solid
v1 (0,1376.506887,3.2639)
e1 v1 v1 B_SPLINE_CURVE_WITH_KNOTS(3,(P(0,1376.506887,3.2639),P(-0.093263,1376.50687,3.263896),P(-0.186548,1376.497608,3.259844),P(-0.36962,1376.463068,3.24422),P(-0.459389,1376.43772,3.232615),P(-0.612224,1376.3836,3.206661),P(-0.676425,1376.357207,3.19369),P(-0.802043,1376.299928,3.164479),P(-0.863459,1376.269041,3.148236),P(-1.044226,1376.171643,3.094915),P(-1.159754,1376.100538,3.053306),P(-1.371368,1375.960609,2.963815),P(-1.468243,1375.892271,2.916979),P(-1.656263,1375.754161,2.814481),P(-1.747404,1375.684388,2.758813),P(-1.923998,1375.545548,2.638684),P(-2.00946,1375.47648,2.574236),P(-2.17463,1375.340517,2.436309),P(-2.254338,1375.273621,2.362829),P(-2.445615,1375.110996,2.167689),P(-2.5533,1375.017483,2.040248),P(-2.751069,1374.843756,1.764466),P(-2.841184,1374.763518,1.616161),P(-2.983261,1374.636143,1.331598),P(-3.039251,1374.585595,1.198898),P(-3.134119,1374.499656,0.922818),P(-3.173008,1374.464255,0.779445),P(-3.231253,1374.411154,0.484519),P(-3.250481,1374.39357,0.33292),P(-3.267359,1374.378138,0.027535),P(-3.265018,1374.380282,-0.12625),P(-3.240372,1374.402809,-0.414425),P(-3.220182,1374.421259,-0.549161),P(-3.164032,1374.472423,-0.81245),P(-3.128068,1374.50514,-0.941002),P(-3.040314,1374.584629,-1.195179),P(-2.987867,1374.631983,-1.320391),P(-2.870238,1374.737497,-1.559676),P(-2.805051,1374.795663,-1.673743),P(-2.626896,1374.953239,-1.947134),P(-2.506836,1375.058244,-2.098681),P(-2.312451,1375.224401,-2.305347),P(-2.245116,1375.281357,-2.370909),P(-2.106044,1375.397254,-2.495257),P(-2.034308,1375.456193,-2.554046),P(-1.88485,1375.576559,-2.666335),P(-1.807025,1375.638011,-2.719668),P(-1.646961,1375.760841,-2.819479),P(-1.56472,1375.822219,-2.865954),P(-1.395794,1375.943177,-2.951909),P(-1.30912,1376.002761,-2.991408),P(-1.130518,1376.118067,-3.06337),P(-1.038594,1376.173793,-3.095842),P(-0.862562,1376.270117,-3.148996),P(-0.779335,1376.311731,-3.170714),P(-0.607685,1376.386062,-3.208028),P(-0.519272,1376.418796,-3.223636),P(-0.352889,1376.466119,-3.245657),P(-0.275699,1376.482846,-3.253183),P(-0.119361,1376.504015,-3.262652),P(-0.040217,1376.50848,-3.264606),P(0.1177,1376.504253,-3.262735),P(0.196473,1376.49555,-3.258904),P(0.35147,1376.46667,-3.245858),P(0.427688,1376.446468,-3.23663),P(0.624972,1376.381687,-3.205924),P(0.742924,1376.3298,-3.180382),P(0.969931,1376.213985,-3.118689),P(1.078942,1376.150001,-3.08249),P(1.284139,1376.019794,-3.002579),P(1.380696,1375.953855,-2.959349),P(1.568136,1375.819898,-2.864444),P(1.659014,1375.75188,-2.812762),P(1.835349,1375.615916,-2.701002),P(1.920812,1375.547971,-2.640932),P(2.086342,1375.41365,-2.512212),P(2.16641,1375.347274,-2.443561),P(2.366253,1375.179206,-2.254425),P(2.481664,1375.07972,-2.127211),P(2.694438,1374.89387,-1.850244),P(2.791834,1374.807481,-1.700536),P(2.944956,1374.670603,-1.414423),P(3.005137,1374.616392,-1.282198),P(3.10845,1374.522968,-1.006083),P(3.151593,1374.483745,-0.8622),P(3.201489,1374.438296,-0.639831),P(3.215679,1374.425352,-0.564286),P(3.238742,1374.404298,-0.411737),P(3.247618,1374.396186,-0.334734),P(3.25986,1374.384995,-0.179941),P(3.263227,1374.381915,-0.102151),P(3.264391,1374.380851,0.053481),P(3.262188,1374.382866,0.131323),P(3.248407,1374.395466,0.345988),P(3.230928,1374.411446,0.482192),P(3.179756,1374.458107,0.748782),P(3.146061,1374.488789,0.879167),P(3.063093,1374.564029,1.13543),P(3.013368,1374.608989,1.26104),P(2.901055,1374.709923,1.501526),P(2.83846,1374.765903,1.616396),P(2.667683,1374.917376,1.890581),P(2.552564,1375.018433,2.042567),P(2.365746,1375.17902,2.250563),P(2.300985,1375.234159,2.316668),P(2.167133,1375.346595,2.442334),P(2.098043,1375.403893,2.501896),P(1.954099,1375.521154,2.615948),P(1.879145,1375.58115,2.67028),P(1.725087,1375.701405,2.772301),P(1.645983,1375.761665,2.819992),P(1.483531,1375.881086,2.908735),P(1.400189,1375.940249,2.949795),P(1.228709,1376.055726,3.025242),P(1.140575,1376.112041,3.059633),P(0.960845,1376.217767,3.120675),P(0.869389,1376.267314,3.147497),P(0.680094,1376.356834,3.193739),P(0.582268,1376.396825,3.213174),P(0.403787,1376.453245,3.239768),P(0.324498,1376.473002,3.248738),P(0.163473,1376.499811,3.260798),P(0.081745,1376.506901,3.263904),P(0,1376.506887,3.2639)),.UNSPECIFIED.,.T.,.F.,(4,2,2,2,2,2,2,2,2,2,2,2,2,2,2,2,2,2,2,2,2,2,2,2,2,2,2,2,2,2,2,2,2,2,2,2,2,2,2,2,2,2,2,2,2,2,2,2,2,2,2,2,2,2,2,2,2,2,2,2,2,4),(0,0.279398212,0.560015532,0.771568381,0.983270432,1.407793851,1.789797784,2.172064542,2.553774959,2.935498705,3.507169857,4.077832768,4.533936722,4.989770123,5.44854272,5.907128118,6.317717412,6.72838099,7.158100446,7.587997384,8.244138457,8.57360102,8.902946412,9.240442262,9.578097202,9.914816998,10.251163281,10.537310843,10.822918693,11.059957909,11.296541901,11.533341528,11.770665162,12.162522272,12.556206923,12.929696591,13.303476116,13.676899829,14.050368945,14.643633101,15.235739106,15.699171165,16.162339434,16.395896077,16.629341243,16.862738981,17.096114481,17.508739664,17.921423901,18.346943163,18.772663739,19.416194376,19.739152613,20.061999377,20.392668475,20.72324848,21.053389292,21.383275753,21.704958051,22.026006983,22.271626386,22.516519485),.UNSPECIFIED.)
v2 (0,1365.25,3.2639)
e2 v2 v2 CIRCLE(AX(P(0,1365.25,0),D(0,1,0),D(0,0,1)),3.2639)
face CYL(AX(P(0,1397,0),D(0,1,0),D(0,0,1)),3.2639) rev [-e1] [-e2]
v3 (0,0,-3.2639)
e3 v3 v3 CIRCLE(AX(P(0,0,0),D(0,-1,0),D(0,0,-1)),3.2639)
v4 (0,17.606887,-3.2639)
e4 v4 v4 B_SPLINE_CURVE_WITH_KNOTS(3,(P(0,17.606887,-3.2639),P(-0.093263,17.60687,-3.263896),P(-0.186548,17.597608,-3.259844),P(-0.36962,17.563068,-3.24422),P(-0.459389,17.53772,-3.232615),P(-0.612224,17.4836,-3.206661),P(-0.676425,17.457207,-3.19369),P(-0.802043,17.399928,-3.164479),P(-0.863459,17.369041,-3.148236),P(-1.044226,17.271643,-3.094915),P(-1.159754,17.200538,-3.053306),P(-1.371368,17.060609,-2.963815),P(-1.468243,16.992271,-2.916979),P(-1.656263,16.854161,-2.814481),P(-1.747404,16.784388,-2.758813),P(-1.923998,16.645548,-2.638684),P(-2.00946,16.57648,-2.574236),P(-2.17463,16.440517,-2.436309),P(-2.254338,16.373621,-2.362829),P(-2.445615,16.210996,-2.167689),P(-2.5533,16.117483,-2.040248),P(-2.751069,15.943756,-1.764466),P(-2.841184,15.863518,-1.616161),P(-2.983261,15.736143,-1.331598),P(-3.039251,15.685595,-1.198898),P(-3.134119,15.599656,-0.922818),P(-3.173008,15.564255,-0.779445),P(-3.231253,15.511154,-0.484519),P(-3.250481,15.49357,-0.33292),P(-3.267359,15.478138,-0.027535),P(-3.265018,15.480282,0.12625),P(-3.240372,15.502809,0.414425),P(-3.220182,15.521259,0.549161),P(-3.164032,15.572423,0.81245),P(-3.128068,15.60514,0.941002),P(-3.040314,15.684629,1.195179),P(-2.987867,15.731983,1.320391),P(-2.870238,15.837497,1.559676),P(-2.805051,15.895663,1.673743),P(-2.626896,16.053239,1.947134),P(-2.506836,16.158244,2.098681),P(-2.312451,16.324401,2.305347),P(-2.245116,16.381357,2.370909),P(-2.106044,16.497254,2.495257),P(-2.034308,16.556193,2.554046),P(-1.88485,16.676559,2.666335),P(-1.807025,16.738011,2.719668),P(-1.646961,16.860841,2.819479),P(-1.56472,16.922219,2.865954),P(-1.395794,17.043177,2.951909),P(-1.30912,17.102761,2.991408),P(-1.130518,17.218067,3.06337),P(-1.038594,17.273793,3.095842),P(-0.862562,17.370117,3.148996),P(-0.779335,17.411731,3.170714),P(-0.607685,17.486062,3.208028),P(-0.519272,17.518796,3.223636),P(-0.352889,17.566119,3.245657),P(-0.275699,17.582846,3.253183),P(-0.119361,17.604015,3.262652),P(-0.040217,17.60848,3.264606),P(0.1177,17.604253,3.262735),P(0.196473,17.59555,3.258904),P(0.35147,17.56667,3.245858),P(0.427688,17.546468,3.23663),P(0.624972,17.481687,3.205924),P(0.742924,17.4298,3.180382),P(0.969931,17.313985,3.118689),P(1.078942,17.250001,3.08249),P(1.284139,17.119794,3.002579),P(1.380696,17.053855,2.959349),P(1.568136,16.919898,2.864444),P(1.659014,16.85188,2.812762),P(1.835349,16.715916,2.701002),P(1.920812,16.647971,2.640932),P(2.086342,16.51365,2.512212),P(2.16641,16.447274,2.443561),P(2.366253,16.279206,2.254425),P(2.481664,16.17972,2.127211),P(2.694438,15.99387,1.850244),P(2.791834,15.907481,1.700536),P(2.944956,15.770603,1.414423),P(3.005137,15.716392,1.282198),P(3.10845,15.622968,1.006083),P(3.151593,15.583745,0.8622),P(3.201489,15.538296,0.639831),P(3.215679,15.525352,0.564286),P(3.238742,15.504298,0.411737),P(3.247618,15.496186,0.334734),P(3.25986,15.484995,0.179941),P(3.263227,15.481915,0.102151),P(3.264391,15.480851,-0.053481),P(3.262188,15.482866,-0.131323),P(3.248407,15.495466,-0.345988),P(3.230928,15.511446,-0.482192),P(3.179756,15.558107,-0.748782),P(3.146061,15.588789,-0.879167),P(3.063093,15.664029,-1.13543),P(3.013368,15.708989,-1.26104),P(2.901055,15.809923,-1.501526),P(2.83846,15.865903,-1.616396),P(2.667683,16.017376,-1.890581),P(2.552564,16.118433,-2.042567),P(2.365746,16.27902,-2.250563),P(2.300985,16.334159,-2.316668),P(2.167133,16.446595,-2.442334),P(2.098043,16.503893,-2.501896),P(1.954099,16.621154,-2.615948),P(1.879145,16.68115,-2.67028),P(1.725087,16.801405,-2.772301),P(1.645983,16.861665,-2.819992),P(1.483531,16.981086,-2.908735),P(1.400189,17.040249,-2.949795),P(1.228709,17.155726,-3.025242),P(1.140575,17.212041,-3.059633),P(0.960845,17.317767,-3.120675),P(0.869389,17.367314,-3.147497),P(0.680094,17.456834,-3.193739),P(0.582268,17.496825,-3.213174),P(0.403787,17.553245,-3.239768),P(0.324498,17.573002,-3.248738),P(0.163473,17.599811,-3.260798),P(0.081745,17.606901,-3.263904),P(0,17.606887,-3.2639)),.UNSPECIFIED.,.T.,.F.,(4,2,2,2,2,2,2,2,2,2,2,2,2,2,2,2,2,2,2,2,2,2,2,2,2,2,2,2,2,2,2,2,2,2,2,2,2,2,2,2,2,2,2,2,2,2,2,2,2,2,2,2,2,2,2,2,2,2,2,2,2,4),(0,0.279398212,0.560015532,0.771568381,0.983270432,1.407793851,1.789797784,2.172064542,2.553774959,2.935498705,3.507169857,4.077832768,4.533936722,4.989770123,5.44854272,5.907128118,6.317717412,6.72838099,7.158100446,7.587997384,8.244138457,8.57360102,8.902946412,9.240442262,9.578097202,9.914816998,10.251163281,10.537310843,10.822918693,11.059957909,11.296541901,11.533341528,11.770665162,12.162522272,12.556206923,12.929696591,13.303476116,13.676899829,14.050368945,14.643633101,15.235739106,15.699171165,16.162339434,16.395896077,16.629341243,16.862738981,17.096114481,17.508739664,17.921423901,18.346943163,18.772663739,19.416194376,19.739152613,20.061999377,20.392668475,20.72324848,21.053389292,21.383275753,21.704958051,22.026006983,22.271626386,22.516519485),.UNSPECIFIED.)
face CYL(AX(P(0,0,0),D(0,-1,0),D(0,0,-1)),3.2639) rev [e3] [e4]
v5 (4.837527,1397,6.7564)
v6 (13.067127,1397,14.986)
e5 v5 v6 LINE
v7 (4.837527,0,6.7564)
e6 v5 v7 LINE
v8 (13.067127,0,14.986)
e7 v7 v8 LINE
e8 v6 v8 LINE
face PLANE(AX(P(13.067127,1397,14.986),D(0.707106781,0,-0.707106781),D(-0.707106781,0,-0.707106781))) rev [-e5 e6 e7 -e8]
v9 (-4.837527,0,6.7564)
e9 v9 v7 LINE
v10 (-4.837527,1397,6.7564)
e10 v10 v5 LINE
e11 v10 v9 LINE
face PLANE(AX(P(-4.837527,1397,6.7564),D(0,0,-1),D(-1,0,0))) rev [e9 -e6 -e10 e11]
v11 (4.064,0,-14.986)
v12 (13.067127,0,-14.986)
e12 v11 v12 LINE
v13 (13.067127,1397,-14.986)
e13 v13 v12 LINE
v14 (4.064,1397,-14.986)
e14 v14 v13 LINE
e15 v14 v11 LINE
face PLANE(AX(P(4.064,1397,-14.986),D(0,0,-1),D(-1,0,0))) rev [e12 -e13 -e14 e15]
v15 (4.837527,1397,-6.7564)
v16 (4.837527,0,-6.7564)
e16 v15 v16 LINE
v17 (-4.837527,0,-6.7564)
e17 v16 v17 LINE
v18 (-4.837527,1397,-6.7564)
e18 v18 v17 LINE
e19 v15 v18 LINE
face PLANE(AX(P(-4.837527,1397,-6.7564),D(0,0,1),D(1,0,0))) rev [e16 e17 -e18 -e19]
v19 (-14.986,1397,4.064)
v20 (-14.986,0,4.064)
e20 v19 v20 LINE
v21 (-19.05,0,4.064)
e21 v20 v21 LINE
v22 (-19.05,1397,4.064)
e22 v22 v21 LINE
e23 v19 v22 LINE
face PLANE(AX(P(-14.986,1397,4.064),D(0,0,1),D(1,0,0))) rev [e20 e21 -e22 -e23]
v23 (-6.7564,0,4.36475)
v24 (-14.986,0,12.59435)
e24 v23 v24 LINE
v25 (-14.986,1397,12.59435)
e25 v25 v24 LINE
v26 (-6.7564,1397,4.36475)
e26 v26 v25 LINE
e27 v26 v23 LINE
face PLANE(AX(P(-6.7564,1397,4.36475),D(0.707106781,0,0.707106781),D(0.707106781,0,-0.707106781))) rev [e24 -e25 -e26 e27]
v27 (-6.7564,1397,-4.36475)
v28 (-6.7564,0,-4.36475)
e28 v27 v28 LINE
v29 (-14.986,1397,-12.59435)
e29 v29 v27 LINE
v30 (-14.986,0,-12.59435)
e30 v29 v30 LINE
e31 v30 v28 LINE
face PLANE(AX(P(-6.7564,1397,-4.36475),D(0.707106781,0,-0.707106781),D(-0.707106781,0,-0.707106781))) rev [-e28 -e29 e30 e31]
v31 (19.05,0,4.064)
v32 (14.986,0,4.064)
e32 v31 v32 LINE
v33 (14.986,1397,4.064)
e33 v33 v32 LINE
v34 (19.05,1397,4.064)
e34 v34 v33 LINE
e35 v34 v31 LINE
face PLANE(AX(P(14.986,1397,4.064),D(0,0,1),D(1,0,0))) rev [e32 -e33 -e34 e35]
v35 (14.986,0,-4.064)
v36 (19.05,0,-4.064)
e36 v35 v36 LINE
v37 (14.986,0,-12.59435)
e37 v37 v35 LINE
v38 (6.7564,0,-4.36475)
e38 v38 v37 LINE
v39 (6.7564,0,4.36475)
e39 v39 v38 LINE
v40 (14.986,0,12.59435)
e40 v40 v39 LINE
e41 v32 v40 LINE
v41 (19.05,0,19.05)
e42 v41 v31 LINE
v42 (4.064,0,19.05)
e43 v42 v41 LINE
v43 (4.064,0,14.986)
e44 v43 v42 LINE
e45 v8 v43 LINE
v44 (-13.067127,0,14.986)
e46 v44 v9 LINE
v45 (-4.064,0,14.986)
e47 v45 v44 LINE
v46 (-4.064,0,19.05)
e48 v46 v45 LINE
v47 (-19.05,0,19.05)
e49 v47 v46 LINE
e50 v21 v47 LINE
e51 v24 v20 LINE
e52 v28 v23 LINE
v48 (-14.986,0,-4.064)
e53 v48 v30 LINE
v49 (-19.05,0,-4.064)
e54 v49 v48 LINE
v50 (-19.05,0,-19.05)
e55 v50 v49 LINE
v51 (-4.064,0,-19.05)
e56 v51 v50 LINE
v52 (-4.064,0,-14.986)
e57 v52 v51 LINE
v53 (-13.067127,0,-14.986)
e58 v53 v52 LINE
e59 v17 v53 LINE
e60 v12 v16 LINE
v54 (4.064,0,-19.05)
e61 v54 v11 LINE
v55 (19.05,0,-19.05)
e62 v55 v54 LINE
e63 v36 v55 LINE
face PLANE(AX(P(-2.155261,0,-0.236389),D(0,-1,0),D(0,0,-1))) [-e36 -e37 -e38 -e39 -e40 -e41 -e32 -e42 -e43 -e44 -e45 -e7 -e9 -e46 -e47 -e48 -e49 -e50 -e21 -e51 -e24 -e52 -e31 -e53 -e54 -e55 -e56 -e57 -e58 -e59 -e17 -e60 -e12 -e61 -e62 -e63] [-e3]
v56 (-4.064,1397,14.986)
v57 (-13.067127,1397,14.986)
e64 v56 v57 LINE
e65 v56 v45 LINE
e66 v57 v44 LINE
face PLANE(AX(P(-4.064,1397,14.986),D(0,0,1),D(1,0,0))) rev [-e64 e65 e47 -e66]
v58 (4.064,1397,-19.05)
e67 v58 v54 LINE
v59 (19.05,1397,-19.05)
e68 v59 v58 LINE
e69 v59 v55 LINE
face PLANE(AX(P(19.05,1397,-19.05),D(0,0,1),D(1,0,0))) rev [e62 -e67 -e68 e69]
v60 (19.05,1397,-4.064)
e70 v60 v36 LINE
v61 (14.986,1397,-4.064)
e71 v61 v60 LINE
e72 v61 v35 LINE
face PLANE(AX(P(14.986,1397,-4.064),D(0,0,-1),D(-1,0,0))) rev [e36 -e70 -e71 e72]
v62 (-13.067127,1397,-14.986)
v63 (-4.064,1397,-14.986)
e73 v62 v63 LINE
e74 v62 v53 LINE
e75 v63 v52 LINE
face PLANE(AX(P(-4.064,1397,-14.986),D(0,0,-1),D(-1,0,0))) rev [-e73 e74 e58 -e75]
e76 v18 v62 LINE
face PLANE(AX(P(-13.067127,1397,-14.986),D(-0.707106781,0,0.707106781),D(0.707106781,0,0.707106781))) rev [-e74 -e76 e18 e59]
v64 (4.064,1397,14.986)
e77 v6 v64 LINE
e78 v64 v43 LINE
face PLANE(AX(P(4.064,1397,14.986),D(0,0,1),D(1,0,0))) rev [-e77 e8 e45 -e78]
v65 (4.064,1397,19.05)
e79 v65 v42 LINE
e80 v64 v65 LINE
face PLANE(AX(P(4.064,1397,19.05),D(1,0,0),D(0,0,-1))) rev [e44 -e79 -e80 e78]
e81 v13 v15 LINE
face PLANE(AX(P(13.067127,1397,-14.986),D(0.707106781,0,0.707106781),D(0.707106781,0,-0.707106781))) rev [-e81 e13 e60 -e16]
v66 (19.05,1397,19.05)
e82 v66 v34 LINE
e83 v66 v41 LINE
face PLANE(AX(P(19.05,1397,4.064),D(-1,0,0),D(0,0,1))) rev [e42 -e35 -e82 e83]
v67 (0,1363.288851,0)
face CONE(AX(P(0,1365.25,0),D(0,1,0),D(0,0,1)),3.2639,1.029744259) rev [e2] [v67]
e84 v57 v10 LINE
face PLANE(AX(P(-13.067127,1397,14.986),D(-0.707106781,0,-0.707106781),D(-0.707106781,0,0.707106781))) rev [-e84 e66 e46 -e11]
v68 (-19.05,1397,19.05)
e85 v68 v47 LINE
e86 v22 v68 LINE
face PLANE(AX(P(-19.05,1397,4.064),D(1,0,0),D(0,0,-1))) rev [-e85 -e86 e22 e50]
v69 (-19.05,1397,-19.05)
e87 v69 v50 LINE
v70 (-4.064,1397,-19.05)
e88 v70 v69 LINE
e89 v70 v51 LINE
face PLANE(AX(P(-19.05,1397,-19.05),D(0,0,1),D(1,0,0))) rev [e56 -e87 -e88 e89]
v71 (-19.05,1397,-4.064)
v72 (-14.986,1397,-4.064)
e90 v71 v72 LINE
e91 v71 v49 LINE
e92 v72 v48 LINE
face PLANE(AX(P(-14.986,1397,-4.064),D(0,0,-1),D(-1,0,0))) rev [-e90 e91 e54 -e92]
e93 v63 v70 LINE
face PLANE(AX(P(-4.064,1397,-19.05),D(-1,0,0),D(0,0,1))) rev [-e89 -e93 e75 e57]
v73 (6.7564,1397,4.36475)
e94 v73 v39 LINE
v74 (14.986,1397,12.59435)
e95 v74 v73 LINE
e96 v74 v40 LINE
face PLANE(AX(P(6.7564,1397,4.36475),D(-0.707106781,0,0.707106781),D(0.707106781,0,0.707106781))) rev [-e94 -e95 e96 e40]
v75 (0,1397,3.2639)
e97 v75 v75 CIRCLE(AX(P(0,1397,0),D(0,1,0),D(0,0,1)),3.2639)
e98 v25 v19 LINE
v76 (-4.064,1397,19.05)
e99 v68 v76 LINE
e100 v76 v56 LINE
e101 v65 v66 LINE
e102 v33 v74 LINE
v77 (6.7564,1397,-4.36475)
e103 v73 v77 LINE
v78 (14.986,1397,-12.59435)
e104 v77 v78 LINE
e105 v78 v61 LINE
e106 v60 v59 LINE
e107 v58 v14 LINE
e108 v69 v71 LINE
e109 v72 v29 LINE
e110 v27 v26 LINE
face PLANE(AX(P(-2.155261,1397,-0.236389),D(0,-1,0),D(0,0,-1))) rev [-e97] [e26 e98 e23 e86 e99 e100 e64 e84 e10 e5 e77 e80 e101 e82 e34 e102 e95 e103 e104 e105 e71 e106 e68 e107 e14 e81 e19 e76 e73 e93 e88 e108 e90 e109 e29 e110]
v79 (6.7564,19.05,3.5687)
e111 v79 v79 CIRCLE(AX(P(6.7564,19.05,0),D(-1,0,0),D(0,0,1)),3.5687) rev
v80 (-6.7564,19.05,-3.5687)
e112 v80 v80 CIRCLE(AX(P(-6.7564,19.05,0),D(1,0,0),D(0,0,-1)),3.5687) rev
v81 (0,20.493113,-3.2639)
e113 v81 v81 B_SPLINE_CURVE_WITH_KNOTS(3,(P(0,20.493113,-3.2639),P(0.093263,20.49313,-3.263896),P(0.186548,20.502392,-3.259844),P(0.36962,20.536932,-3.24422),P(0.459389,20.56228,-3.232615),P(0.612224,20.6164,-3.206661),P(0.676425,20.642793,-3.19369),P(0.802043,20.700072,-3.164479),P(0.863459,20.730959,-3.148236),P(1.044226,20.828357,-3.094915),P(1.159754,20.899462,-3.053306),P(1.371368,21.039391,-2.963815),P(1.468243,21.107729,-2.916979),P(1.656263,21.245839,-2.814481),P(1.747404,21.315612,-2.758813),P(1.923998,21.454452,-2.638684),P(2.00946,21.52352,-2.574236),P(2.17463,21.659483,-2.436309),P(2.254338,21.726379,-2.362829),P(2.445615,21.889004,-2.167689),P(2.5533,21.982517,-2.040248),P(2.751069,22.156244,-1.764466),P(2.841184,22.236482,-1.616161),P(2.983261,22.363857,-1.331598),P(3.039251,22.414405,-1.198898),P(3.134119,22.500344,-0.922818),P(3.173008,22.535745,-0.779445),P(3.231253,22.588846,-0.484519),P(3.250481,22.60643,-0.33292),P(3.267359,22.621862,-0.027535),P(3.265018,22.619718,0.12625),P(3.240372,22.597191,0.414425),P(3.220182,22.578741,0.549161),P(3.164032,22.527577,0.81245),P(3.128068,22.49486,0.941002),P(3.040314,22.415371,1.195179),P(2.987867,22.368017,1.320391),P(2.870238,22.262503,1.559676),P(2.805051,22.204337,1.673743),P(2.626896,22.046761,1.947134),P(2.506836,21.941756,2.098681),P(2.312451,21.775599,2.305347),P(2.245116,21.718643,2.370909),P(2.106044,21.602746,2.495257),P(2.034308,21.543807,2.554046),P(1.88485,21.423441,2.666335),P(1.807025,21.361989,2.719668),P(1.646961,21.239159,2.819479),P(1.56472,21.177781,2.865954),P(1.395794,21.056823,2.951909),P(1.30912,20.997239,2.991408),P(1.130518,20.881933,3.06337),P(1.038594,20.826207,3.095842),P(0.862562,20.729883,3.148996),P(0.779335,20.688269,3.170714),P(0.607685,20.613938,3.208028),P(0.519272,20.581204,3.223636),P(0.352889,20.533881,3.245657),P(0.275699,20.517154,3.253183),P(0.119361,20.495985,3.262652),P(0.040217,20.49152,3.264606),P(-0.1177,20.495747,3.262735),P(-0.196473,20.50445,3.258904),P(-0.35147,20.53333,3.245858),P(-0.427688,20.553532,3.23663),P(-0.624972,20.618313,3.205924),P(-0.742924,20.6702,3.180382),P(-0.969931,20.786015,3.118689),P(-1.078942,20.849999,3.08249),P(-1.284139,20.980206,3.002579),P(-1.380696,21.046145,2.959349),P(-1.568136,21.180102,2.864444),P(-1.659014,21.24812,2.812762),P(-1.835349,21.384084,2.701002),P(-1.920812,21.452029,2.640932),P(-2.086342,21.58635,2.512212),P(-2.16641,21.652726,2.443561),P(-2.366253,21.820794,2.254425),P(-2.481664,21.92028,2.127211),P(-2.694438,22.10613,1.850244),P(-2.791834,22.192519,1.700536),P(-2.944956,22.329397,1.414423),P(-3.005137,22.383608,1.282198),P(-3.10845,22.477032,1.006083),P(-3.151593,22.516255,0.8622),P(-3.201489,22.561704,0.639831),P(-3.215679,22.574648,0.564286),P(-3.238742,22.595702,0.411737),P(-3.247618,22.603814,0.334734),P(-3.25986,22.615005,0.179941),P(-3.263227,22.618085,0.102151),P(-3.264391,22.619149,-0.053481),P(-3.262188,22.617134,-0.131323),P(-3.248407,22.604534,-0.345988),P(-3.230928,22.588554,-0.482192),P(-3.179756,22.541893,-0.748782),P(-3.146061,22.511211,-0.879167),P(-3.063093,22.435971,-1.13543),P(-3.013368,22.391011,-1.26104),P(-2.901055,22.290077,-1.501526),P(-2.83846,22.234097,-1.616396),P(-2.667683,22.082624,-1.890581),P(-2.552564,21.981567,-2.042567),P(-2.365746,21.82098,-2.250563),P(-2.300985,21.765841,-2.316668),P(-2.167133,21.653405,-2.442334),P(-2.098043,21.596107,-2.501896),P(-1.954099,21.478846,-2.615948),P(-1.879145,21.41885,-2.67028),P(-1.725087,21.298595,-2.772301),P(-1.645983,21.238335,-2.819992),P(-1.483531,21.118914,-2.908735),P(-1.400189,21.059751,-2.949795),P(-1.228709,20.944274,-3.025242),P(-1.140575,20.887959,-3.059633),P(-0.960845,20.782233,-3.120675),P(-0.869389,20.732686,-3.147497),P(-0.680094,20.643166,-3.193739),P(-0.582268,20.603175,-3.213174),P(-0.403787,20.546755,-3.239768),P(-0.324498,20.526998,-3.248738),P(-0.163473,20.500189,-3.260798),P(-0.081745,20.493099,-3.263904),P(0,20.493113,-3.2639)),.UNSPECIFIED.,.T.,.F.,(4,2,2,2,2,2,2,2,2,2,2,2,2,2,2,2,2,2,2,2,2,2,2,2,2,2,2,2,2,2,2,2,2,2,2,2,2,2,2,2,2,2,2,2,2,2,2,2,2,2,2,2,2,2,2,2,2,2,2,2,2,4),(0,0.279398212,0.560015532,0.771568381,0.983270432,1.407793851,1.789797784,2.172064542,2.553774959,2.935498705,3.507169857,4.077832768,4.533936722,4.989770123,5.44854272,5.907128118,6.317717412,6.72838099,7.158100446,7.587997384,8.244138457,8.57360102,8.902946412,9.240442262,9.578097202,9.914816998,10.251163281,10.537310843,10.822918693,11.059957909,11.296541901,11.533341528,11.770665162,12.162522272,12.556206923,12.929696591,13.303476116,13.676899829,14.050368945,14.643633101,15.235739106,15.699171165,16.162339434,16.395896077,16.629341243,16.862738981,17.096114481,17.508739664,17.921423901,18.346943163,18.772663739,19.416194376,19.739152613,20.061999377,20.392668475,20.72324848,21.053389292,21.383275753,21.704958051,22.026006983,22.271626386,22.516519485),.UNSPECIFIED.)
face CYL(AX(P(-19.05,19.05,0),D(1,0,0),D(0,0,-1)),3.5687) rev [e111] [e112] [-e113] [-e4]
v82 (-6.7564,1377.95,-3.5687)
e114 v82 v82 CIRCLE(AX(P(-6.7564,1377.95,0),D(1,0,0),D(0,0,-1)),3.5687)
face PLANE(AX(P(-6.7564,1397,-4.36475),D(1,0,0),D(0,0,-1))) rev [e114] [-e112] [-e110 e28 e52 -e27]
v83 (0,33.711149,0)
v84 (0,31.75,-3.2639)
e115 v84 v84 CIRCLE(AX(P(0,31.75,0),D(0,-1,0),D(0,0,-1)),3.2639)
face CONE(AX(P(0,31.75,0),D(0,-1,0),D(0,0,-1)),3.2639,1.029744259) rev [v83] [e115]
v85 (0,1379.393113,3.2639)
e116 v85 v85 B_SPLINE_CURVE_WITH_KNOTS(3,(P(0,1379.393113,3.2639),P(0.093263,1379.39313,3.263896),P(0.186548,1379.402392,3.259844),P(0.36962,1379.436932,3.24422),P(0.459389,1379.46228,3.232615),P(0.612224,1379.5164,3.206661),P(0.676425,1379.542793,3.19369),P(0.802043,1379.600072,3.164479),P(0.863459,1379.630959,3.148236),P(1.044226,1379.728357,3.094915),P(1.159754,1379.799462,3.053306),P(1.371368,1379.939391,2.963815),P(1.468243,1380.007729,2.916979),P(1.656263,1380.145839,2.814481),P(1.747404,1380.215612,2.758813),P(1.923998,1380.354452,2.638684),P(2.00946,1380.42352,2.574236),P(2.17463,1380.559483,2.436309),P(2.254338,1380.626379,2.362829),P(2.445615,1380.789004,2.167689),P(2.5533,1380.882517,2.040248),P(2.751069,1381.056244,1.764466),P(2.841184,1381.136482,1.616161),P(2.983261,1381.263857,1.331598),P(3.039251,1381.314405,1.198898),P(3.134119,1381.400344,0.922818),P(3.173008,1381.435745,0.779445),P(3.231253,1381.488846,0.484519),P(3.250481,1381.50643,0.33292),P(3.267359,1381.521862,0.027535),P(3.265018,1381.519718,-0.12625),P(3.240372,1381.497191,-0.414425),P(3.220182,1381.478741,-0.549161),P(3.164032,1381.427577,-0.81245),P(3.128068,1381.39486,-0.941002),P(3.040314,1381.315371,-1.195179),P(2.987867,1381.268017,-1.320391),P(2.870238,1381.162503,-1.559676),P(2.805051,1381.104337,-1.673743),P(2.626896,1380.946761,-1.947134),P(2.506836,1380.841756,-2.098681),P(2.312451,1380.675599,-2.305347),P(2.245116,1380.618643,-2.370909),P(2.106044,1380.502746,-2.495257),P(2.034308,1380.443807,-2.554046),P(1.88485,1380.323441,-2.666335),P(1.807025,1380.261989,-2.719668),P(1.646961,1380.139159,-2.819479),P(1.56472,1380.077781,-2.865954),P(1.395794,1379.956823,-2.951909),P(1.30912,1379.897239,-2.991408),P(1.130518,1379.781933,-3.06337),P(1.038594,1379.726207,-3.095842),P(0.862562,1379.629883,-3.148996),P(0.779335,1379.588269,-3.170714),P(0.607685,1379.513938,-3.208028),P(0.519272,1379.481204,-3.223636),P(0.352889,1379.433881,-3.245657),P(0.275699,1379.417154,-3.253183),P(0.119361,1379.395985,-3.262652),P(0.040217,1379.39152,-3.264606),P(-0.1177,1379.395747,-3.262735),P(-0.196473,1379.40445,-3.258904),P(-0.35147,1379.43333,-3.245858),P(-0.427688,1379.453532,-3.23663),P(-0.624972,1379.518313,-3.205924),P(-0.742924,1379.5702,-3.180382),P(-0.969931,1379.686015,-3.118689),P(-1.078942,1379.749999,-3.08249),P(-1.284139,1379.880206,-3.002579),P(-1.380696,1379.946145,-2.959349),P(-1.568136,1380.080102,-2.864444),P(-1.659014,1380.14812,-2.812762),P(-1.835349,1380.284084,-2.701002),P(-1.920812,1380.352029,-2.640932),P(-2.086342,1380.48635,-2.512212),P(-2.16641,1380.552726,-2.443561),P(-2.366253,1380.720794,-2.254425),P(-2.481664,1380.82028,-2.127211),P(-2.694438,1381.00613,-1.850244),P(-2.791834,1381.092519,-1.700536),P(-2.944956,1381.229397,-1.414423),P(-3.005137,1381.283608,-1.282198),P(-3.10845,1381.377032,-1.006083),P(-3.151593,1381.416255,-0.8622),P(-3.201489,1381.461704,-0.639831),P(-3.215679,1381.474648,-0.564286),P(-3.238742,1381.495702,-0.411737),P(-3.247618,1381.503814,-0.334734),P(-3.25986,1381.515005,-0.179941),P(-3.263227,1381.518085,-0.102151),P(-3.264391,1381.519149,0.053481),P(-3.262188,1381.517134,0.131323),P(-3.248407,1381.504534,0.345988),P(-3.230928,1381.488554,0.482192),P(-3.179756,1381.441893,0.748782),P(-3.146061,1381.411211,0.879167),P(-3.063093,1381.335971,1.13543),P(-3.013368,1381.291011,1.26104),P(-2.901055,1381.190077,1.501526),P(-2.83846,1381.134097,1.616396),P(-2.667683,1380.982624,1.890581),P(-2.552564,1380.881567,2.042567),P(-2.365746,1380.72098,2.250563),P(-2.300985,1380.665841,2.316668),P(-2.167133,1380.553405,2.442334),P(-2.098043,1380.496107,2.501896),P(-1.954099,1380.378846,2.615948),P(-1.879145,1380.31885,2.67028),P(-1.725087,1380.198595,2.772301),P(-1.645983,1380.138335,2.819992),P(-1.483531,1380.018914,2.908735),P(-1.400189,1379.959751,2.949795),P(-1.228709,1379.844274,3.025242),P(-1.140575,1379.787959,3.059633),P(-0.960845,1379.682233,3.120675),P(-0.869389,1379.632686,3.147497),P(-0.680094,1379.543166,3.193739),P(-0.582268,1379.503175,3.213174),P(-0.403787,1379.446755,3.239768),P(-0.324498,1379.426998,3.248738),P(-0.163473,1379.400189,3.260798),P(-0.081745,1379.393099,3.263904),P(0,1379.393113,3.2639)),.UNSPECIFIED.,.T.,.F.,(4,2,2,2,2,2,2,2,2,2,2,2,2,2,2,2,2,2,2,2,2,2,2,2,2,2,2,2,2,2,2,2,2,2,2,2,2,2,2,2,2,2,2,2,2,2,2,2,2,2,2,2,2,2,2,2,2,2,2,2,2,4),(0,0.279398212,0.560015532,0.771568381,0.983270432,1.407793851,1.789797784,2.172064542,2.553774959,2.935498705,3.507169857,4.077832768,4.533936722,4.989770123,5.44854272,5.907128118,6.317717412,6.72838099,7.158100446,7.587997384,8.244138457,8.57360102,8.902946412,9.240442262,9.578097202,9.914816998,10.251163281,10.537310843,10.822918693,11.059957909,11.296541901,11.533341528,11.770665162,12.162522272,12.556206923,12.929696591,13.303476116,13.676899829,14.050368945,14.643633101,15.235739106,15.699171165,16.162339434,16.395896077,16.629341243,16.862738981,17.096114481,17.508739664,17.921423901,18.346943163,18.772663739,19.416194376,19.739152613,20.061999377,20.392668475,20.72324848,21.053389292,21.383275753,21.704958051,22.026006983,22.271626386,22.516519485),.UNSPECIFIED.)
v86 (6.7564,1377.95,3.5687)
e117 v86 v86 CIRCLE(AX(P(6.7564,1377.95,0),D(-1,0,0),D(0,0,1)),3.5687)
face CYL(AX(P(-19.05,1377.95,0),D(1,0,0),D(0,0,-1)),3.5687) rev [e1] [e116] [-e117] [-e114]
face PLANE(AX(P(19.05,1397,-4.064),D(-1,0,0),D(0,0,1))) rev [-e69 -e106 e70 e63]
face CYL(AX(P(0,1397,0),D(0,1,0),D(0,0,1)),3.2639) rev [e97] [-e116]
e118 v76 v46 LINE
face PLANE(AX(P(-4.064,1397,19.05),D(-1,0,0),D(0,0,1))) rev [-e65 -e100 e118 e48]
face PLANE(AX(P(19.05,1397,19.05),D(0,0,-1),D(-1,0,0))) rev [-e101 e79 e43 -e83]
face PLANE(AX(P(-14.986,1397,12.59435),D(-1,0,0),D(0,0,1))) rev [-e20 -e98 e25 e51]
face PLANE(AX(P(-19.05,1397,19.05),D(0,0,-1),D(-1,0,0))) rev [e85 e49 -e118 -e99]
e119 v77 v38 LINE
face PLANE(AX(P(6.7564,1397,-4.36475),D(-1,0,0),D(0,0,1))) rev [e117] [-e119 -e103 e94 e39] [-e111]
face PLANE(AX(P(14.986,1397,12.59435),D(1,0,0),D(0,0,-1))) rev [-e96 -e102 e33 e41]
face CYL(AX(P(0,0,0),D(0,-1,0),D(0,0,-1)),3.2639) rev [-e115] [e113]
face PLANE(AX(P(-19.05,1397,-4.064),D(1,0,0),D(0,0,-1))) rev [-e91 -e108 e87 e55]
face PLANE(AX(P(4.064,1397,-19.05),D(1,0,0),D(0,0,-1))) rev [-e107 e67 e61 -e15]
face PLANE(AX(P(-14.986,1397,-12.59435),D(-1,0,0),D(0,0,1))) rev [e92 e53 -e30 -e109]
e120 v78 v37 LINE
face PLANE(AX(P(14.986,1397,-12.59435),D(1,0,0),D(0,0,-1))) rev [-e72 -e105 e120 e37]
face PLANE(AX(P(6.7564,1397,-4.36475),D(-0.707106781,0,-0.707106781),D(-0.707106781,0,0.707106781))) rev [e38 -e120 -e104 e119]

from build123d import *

# Parameters (mm, degrees)
EXTRUDE1_DEPTH     = 1397
SKETCH2_R          = 3.5687
CUT_EXTRUDE1_DEPTH = 1398.649280936


# Read off the part's stored shape, not the designer's step: 1515<1>
with BuildPart() as part:
    # Sketch1<2> → Extrude1 (new body)
    with BuildSketch(Plane(origin=(0, 0, 0), x_dir=(1, 0, 0), z_dir=(0, 1, 0))):
        Polygon((-6.7564, 4.364749804), (-6.7564, -4.364749804), (-14.986, -12.594349804), (-14.986, -4.064), (-19.05, -4.064), (-19.05, -19.05), (-4.064, -19.05), (-4.064, -14.986), (-13.067127258, -14.986), (-4.837527258, -6.7564), (4.837527258, -6.7564), (13.067127258, -14.986), (4.064, -14.986), (4.064, -19.05), (19.05, -19.05), (19.05, -4.064), (14.986, -4.064), (14.986, -12.594349804), (6.7564, -4.364749804), (6.7564, 4.364749804), (14.986, 12.594349804), (14.986, 4.064), (19.05, 4.064), (19.05, 19.05), (4.064, 19.05), (4.064, 14.986), (13.067127258, 14.986), (4.837527258, 6.7564), (-4.837527258, 6.7564), (-13.067127258, 14.986), (-4.064, 14.986), (-4.064, 19.05), (-19.05, 19.05), (-19.05, 4.064), (-14.986, 4.064), (-14.986, 12.594349804), align=None)
    extrude(amount=EXTRUDE1_DEPTH)

    # Sketch2 → Cut-Extrude1 (cut, through all)
    with BuildSketch(Plane(origin=(19.05, 0, 0), x_dir=(0, 0, -1), z_dir=(1, 0, 0))):
        with Locations((0, 1377.95)):
            Circle(SKETCH2_R)
    cut_extrude1 = extrude(amount=-CUT_EXTRUDE1_DEPTH, mode=Mode.SUBTRACT)

    # Mirror1: Cut-Extrude1 across plane
    add(cut_extrude1.mirror(Plane.ZX.offset(698.5)), mode=Mode.SUBTRACT)

    # Sketch3 → 5/16-18 Tapped Hole1 (revolve, cut)
    with BuildSketch(Plane(origin=(0, 1397, 0), x_dir=(0, 0, 1), z_dir=(1, 0, 0))):
        Polygon((0, 0), (0, 33.711148974), (3.2639, 31.75), (3.2639, 0), align=None)
    f_5_16_18_tapped_hole1 = revolve(axis=Axis((0, 1403.35, 0), (0, -1, 0)), mode=Mode.SUBTRACT)

    # Mirror2: 5/16-18 Tapped Hole1 across plane
    add(f_5_16_18_tapped_hole1.mirror(Plane.ZX.offset(698.5)), mode=Mode.SUBTRACT)


solid = part.part
